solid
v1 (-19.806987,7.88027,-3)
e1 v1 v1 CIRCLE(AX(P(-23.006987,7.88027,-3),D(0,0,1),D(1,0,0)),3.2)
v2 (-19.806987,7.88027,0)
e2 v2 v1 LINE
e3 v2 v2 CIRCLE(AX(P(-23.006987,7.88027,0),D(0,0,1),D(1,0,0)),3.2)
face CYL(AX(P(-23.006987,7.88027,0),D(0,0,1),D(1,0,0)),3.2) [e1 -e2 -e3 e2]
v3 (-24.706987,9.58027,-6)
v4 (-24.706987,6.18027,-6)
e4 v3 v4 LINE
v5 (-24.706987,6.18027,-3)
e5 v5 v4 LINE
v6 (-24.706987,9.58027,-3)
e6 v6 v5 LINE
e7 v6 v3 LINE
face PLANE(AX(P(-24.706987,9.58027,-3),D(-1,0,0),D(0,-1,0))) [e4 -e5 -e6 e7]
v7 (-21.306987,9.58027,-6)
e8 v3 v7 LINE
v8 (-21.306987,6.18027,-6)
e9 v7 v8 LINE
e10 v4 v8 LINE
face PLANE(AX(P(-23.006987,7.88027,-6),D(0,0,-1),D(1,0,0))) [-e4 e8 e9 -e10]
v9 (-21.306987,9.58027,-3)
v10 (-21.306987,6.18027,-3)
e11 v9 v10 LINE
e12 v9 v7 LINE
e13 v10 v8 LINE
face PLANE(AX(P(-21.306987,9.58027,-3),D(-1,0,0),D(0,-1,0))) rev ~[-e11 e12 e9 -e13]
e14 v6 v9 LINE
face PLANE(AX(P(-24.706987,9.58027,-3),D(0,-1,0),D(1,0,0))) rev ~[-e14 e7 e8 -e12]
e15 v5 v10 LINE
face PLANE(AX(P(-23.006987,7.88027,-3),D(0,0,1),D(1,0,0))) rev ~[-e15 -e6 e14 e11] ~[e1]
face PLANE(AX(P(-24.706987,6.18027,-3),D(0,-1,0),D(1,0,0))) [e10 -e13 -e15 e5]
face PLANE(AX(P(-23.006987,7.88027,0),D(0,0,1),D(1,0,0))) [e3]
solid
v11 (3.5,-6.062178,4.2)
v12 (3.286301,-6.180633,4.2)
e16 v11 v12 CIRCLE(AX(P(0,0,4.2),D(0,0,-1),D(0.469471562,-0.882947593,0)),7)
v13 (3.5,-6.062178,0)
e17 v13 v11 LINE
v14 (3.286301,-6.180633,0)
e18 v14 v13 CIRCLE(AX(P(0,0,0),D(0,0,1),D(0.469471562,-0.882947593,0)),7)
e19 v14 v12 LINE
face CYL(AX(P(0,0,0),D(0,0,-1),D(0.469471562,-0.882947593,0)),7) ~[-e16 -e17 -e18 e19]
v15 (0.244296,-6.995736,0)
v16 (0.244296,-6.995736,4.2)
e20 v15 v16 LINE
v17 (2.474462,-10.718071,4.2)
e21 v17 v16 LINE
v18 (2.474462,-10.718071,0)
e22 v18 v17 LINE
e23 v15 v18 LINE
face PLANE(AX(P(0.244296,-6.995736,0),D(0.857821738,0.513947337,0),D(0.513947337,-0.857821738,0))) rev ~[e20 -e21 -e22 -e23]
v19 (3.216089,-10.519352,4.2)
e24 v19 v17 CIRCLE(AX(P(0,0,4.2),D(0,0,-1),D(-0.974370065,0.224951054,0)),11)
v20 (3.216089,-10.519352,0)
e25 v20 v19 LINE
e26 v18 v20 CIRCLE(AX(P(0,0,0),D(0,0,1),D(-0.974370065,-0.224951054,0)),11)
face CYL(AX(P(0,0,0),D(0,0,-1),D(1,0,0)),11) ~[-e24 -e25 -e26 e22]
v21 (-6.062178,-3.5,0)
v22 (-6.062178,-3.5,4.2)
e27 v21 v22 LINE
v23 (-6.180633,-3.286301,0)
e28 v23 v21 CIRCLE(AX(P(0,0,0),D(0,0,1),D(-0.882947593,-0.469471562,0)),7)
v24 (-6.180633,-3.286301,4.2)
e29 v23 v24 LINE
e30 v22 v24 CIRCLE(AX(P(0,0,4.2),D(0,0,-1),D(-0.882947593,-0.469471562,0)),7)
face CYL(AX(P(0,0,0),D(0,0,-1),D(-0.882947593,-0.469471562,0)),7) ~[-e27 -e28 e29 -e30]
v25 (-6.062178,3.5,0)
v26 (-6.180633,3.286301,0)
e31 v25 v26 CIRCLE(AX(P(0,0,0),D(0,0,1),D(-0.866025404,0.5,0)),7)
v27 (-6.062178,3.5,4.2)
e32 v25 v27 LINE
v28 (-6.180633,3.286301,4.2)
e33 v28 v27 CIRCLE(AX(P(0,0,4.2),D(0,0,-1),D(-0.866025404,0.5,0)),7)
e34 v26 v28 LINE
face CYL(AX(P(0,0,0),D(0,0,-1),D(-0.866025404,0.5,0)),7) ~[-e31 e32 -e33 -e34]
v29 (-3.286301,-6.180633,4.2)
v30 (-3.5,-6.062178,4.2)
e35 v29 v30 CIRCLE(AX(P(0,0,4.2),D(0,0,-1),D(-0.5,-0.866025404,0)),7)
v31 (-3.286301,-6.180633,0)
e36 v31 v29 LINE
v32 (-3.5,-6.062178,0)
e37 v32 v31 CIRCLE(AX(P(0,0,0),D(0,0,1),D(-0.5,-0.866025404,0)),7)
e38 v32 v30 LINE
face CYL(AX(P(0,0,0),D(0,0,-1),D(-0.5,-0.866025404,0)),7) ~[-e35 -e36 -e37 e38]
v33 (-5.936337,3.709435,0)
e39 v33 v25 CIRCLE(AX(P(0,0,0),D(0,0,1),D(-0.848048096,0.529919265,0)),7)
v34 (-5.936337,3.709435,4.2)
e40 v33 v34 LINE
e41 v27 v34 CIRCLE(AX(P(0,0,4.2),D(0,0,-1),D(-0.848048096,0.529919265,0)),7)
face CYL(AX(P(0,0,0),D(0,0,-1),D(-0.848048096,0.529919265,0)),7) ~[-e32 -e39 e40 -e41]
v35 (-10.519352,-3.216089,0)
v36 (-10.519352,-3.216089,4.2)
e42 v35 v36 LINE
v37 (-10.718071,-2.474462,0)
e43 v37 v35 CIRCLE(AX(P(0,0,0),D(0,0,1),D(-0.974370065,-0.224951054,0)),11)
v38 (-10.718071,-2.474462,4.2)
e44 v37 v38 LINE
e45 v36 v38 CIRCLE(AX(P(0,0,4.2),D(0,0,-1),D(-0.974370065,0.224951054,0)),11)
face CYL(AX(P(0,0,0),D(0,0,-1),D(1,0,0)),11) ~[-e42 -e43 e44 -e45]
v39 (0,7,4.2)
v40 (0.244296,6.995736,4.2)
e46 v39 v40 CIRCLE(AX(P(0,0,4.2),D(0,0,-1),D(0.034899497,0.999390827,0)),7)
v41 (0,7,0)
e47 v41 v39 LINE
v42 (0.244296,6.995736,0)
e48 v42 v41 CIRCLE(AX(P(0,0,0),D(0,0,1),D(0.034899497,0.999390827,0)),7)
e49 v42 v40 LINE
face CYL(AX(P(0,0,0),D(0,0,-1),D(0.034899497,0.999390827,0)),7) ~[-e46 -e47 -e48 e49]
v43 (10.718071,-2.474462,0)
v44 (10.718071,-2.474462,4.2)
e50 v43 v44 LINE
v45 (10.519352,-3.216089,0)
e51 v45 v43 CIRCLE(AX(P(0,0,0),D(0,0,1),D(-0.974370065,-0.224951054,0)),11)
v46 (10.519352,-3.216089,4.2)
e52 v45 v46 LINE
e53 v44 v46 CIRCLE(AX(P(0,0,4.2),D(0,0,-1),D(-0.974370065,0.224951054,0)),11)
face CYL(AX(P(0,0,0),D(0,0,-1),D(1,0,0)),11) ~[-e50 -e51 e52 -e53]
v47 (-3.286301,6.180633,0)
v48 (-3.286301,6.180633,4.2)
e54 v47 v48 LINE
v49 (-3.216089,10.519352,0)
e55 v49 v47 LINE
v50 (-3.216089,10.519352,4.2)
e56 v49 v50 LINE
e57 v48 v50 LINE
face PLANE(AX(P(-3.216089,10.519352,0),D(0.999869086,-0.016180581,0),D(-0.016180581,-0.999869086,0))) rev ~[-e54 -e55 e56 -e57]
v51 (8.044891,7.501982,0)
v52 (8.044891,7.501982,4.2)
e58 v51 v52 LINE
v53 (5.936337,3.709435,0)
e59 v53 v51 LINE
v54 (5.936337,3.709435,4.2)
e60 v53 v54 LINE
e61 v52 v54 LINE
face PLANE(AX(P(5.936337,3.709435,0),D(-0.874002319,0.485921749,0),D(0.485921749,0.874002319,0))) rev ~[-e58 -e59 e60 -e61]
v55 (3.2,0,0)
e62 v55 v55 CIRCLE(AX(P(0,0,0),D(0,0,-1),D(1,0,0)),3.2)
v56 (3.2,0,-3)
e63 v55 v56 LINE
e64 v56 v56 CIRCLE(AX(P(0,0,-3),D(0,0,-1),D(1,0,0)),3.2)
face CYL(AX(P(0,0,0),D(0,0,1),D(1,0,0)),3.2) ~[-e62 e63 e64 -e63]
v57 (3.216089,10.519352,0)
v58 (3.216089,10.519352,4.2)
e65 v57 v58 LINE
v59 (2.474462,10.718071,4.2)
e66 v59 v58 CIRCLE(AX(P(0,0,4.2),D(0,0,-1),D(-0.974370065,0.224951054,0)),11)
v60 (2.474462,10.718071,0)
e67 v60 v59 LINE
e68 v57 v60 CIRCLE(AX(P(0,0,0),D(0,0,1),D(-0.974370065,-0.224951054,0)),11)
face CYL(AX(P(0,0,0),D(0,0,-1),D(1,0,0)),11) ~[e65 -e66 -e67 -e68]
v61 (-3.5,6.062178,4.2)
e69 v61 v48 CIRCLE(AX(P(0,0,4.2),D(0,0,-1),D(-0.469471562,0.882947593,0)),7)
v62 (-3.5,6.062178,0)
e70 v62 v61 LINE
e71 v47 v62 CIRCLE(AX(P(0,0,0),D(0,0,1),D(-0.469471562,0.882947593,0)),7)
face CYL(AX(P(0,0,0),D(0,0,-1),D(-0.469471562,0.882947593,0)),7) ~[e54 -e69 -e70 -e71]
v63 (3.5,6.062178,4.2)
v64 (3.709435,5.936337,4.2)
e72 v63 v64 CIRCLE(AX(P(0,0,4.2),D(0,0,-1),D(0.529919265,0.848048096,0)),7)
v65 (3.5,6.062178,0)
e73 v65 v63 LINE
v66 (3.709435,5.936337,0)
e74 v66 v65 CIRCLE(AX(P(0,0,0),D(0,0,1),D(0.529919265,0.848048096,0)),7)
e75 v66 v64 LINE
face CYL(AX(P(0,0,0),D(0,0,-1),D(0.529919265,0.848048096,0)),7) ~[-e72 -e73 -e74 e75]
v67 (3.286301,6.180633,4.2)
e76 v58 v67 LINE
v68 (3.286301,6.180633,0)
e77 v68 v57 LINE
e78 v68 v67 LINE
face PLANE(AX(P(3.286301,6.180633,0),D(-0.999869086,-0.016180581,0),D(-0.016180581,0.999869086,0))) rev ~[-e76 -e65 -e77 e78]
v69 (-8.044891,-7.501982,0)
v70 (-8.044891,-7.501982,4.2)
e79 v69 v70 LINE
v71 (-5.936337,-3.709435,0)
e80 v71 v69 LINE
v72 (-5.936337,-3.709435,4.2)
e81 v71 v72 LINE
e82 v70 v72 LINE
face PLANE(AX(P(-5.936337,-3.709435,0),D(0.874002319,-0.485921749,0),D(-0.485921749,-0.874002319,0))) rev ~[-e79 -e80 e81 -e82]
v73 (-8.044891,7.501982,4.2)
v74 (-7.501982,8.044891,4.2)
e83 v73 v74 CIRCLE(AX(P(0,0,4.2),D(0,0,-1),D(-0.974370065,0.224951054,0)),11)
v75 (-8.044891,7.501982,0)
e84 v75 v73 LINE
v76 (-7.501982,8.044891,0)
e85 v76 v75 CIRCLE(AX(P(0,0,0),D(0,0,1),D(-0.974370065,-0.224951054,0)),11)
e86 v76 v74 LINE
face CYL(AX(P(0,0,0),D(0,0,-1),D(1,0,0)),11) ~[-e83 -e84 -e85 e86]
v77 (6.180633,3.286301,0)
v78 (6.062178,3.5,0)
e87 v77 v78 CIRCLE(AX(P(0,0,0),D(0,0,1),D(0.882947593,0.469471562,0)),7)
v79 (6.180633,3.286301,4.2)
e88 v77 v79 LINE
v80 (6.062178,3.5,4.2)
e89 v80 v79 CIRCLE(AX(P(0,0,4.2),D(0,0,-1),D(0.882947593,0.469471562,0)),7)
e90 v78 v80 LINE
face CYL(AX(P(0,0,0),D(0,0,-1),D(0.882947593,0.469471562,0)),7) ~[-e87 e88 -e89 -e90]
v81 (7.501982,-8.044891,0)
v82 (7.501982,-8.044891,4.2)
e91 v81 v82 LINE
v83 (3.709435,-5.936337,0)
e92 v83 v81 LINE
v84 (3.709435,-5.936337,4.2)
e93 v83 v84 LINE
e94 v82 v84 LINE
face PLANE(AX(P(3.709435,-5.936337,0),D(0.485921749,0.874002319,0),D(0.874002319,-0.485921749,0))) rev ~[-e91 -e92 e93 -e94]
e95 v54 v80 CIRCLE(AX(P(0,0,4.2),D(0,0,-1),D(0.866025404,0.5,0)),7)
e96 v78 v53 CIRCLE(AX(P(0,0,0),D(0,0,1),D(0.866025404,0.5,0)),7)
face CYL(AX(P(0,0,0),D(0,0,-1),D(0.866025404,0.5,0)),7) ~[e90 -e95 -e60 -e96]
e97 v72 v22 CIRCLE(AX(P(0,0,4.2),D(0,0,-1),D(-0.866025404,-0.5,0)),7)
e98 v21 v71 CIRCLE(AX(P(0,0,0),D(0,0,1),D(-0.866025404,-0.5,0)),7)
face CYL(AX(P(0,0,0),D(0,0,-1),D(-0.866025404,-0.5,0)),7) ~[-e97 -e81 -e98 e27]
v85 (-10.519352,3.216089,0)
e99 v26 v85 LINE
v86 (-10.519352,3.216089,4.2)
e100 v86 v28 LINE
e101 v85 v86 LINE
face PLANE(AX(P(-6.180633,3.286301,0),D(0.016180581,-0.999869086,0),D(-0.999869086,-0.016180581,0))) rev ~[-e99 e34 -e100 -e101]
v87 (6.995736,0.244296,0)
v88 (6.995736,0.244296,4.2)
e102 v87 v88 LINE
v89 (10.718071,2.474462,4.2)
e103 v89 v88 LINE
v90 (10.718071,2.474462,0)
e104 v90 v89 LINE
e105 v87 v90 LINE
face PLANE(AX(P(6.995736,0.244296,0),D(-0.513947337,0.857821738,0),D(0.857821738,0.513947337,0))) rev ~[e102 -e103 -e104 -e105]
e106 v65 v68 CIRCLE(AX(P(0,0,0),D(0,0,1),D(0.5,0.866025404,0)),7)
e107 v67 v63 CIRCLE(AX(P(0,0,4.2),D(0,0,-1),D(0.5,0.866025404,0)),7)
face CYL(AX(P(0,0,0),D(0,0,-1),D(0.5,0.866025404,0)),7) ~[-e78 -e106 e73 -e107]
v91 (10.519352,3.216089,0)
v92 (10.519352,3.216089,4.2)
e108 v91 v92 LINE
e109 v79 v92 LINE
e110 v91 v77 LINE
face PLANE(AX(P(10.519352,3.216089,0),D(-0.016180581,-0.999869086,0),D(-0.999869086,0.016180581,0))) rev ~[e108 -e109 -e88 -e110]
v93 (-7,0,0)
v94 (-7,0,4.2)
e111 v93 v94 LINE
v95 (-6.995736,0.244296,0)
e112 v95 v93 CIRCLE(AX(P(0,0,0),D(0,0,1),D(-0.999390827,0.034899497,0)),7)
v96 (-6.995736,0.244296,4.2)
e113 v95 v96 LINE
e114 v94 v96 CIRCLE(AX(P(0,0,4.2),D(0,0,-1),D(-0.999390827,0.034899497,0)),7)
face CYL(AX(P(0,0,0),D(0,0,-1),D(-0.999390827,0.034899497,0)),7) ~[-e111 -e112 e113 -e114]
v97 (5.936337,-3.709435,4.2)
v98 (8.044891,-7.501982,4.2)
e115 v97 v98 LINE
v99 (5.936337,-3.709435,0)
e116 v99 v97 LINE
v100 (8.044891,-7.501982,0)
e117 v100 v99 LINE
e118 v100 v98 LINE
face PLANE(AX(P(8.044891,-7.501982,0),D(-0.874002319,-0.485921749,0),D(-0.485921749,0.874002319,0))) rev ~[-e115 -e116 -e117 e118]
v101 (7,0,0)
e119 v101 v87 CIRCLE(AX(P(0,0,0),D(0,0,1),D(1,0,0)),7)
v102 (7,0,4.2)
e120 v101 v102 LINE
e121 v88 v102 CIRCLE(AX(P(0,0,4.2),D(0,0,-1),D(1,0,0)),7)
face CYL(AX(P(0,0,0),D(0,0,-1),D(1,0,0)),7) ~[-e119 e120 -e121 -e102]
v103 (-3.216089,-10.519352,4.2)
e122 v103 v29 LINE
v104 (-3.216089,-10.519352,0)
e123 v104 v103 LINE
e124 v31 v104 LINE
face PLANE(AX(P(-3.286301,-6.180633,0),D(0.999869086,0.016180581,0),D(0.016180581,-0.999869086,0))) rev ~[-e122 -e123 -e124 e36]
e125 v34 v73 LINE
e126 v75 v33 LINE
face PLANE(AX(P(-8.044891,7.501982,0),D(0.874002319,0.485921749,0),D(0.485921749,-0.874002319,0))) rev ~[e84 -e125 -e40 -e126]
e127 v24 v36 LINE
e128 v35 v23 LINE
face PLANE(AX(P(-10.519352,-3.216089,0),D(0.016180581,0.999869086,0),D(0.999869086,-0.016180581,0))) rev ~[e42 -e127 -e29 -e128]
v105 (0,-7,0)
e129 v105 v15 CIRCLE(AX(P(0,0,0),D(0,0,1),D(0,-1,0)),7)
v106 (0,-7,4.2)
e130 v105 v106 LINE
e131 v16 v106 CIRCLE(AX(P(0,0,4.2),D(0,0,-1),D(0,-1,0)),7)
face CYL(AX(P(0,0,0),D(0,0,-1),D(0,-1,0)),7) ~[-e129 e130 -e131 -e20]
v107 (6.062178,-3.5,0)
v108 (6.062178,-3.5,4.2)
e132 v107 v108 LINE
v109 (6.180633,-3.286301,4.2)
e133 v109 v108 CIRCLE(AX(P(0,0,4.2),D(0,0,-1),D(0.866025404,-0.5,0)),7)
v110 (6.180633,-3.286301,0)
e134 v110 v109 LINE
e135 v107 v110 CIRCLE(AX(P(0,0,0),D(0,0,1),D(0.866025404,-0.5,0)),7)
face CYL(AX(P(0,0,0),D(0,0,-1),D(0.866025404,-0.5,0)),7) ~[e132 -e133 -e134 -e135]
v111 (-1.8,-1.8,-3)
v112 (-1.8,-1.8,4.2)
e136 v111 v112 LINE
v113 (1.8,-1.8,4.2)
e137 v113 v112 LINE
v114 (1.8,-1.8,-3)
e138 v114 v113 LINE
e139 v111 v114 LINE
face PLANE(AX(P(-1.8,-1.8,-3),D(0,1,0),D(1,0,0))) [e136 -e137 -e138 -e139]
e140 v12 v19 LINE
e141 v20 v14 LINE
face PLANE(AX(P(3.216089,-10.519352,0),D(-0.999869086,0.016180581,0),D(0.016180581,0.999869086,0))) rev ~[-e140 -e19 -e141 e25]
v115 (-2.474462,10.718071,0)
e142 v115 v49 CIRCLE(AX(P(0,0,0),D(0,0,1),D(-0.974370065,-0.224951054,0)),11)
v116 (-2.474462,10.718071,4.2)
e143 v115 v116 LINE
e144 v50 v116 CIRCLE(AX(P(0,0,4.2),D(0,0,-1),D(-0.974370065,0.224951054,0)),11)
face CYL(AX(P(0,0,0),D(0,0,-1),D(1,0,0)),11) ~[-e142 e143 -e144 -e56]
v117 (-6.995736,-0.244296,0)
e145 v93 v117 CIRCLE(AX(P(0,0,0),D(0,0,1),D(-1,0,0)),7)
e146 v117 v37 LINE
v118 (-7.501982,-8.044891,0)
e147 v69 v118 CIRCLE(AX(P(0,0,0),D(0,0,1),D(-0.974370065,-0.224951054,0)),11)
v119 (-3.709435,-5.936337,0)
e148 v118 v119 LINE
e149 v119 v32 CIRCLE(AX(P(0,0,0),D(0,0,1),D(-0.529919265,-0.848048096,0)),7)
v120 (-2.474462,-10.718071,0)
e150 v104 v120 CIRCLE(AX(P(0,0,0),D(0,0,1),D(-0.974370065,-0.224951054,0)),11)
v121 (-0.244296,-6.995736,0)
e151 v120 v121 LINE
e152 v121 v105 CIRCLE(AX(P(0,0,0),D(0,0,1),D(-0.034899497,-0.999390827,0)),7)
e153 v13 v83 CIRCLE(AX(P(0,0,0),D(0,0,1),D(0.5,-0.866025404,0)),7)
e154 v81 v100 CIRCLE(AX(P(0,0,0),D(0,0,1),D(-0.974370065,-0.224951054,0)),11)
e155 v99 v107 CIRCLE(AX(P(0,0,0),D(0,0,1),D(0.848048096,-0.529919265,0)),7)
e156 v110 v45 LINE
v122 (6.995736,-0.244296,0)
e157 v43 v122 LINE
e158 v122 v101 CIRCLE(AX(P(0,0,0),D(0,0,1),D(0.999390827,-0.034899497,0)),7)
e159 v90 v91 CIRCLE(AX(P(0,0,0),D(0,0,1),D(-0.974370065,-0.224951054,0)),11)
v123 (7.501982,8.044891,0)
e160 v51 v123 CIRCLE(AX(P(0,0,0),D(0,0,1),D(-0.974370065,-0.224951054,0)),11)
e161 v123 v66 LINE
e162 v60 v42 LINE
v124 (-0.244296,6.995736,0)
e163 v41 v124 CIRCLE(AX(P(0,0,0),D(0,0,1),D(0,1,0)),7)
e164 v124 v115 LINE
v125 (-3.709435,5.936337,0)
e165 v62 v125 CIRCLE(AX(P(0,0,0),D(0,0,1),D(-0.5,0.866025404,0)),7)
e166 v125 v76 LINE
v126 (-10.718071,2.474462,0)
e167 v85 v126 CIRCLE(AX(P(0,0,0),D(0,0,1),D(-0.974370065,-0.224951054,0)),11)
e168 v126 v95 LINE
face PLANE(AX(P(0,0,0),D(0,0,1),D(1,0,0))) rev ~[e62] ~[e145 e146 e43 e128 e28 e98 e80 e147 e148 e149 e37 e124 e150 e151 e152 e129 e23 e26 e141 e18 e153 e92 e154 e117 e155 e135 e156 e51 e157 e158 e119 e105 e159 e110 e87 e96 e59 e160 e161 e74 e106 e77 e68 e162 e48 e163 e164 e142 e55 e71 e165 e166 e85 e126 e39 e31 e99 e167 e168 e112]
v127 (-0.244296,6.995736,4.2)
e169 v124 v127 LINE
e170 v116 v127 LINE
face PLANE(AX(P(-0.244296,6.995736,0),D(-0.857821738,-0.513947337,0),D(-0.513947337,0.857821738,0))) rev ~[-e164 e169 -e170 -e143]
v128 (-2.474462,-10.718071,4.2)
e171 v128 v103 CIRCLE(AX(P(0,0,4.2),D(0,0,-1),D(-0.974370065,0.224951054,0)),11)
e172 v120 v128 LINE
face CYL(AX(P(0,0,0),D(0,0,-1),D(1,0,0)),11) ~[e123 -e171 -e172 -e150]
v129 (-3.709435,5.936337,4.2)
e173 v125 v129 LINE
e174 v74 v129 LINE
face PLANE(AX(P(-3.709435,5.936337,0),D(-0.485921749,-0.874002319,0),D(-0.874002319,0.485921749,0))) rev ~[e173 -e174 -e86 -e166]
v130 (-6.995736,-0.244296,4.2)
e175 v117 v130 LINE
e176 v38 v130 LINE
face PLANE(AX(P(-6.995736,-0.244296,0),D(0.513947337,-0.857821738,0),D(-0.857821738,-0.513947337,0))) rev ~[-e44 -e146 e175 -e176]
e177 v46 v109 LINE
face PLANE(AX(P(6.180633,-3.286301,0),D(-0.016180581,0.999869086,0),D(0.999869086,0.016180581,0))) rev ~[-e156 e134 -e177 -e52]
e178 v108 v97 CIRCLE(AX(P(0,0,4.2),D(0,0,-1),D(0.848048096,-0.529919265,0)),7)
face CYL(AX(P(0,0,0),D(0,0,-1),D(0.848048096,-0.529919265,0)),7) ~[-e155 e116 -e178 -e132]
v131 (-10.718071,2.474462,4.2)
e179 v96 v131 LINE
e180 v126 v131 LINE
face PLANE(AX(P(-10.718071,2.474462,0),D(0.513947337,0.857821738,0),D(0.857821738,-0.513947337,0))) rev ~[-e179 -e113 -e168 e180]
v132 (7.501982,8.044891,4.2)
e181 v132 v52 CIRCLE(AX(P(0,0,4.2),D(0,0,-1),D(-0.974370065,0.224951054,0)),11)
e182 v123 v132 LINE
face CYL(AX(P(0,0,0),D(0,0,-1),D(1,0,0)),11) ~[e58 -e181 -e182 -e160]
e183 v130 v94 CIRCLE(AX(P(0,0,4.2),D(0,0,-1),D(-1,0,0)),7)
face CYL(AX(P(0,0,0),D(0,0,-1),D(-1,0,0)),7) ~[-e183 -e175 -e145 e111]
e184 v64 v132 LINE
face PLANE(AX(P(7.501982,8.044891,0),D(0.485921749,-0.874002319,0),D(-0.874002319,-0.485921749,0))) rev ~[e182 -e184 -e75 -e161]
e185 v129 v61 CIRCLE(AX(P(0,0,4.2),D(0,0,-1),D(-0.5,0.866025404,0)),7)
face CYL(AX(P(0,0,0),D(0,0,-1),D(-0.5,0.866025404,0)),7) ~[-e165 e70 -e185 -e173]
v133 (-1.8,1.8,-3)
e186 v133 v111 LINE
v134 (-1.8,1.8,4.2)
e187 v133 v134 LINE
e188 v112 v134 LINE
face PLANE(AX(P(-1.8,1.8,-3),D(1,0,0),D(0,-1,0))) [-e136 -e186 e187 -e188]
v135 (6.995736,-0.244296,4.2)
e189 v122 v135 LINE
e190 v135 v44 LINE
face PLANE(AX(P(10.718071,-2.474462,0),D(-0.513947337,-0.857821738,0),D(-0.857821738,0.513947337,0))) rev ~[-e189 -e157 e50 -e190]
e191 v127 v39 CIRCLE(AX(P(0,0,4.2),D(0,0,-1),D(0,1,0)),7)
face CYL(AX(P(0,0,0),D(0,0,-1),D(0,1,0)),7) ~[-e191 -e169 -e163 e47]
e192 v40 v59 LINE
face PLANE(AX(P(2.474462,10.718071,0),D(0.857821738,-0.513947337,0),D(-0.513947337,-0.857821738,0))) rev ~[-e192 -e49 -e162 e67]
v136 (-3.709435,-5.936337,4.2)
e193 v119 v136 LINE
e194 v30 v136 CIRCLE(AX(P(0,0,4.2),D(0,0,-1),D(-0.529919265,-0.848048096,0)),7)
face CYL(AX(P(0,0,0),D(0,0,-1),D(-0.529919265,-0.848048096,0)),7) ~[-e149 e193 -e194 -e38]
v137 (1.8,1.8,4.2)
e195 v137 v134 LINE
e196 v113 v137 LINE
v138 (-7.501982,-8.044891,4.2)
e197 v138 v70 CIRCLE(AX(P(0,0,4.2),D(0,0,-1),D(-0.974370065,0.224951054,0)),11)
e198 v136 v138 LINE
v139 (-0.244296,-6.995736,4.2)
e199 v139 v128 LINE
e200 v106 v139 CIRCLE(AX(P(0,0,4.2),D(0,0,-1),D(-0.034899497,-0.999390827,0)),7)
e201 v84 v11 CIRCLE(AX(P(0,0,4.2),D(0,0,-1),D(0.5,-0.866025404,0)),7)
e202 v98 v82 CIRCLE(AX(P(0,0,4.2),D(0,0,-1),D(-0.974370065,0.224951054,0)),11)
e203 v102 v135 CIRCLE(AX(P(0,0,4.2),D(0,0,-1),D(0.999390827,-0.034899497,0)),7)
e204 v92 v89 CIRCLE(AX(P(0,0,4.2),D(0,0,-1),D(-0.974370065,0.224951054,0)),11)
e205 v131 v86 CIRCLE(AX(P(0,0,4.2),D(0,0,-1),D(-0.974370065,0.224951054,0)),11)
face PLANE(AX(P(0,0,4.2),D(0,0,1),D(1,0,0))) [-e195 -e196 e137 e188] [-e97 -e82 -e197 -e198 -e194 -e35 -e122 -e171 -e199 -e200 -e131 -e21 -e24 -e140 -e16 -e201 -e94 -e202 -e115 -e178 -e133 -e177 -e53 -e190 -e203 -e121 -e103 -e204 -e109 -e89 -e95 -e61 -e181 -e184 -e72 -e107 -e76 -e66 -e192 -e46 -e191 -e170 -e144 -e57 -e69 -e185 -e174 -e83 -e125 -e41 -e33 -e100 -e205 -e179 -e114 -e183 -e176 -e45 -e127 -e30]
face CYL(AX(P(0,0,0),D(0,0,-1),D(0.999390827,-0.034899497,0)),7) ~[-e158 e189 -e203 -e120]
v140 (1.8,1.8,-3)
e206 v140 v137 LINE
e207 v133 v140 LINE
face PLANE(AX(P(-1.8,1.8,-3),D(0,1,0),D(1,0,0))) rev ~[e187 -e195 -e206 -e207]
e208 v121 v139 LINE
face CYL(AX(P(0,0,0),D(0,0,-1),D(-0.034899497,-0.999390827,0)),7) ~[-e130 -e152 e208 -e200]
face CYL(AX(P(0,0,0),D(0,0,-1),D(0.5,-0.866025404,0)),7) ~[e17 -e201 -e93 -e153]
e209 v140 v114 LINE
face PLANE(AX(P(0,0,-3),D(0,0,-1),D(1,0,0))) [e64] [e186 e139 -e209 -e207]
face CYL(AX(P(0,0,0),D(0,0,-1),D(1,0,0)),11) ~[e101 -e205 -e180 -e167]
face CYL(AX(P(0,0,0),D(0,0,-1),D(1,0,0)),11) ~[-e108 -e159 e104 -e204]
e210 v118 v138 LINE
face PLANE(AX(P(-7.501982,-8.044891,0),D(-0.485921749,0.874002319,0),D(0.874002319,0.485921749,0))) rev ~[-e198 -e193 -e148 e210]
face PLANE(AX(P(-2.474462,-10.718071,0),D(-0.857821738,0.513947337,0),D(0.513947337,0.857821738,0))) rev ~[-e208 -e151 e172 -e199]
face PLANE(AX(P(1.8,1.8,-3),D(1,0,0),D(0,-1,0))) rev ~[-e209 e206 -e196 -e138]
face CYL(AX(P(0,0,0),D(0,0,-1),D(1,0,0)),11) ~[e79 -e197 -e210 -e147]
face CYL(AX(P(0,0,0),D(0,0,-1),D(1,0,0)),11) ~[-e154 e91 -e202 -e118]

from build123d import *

# Parameters (mm, degrees)
F0_R            = 11
F1_DEPTH        = 4.2
F3_DEPTH        = 4.201
F3_COPIES_COUNT = 12
F5_R            = 3.2
F6_DEPTH        = 3
F7_W            = 3.6
F7_H            = 3.6
F8_DEPTH        = 7.201
F9_R            = 3.2
F10_DEPTH       = 3
F11_W           = 3.4
F11_H           = 3.4
F12_DEPTH       = 3


# Not quite as in the source:
# - a pattern or mirror of a feature is missing from the dataset's text; its kind, count and spacing are read off the source's solid


with BuildPart() as f1:
    # F0 (on Top) → F1 (new body)
    with BuildSketch(Plane.XY):
        Circle(F0_R)
    extrude(amount=F1_DEPTH)

    # F2 (on face) → F3 (cut, through all)
    with BuildSketch(Plane(origin=(0, 0, 0), x_dir=(1, 0, 0), z_dir=(0, 0, -1))):
        with BuildLine():
            ThreePointArc((-6.9957357891, -0.2442964769), (-6.9989338661, -0.1221668451), (-7, 0))
            Line((-7, 0), (-11, 0))
            ThreePointArc((-11, 0), (-10.9292904124, -1.2452353514), (-10.7180707126, -2.4744615978))
            Line((-10.7180707126, -2.4744615978), (-6.9957357891, -0.2442964769))
        make_face()
        with BuildLine():
            Line((-11, 0), (-7, 0))
            ThreePointArc((-7, 0), (-6.9989338661, 0.1221668451), (-6.9957357891, 0.2442964769))
            Line((-6.9957357891, 0.2442964769), (-10.7180707126, 2.4744615978))
            ThreePointArc((-10.7180707126, 2.4744615978), (-10.9292904124, 1.2452353514), (-11, 0))
        make_face()
    f3 = extrude(amount=-F3_DEPTH, mode=Mode.SUBTRACT)

    # F3_copies: F3 ×12 about axis
    f3_copies_axis = Axis((0, 0, 0), (0, 0, 1))
    for i in range(1, F3_COPIES_COUNT):
        add(f3.rotate(f3_copies_axis, i * 360 / F3_COPIES_COUNT), mode=Mode.SUBTRACT)

    # F5 (on face) → F6 (join)
    with BuildSketch(Plane(origin=(0, 0, 0), x_dir=(1, 0, 0), z_dir=(0, 0, -1))):
        Circle(F5_R)
    extrude(amount=F6_DEPTH)

    # F7 (on face) → F8 (cut, through all)
    with BuildSketch(Plane(origin=(0, 0, -3), x_dir=(1, 0, 0), z_dir=(0, 0, -1))):
        Rectangle(F7_W, F7_H)
    extrude(amount=-F8_DEPTH, mode=Mode.SUBTRACT)


with BuildPart() as f10:
    # F9 (on Top) → F10 (new body)
    with BuildSketch(Plane.XY):
        with Locations((-23.0069868267, 7.8802704811)):
            Circle(F9_R)
    extrude(amount=-F10_DEPTH)

    # F11 (on face) → F12 (join)
    with BuildSketch(Plane(origin=(0, 0, -3), x_dir=(1, 0, 0), z_dir=(0, 0, -1))):
        with Locations((-23.0069868267, -7.8802704811)):
            Rectangle(F11_W, F11_H)
    extrude(amount=F12_DEPTH)


solid = Compound([f1.part, f10.part])
